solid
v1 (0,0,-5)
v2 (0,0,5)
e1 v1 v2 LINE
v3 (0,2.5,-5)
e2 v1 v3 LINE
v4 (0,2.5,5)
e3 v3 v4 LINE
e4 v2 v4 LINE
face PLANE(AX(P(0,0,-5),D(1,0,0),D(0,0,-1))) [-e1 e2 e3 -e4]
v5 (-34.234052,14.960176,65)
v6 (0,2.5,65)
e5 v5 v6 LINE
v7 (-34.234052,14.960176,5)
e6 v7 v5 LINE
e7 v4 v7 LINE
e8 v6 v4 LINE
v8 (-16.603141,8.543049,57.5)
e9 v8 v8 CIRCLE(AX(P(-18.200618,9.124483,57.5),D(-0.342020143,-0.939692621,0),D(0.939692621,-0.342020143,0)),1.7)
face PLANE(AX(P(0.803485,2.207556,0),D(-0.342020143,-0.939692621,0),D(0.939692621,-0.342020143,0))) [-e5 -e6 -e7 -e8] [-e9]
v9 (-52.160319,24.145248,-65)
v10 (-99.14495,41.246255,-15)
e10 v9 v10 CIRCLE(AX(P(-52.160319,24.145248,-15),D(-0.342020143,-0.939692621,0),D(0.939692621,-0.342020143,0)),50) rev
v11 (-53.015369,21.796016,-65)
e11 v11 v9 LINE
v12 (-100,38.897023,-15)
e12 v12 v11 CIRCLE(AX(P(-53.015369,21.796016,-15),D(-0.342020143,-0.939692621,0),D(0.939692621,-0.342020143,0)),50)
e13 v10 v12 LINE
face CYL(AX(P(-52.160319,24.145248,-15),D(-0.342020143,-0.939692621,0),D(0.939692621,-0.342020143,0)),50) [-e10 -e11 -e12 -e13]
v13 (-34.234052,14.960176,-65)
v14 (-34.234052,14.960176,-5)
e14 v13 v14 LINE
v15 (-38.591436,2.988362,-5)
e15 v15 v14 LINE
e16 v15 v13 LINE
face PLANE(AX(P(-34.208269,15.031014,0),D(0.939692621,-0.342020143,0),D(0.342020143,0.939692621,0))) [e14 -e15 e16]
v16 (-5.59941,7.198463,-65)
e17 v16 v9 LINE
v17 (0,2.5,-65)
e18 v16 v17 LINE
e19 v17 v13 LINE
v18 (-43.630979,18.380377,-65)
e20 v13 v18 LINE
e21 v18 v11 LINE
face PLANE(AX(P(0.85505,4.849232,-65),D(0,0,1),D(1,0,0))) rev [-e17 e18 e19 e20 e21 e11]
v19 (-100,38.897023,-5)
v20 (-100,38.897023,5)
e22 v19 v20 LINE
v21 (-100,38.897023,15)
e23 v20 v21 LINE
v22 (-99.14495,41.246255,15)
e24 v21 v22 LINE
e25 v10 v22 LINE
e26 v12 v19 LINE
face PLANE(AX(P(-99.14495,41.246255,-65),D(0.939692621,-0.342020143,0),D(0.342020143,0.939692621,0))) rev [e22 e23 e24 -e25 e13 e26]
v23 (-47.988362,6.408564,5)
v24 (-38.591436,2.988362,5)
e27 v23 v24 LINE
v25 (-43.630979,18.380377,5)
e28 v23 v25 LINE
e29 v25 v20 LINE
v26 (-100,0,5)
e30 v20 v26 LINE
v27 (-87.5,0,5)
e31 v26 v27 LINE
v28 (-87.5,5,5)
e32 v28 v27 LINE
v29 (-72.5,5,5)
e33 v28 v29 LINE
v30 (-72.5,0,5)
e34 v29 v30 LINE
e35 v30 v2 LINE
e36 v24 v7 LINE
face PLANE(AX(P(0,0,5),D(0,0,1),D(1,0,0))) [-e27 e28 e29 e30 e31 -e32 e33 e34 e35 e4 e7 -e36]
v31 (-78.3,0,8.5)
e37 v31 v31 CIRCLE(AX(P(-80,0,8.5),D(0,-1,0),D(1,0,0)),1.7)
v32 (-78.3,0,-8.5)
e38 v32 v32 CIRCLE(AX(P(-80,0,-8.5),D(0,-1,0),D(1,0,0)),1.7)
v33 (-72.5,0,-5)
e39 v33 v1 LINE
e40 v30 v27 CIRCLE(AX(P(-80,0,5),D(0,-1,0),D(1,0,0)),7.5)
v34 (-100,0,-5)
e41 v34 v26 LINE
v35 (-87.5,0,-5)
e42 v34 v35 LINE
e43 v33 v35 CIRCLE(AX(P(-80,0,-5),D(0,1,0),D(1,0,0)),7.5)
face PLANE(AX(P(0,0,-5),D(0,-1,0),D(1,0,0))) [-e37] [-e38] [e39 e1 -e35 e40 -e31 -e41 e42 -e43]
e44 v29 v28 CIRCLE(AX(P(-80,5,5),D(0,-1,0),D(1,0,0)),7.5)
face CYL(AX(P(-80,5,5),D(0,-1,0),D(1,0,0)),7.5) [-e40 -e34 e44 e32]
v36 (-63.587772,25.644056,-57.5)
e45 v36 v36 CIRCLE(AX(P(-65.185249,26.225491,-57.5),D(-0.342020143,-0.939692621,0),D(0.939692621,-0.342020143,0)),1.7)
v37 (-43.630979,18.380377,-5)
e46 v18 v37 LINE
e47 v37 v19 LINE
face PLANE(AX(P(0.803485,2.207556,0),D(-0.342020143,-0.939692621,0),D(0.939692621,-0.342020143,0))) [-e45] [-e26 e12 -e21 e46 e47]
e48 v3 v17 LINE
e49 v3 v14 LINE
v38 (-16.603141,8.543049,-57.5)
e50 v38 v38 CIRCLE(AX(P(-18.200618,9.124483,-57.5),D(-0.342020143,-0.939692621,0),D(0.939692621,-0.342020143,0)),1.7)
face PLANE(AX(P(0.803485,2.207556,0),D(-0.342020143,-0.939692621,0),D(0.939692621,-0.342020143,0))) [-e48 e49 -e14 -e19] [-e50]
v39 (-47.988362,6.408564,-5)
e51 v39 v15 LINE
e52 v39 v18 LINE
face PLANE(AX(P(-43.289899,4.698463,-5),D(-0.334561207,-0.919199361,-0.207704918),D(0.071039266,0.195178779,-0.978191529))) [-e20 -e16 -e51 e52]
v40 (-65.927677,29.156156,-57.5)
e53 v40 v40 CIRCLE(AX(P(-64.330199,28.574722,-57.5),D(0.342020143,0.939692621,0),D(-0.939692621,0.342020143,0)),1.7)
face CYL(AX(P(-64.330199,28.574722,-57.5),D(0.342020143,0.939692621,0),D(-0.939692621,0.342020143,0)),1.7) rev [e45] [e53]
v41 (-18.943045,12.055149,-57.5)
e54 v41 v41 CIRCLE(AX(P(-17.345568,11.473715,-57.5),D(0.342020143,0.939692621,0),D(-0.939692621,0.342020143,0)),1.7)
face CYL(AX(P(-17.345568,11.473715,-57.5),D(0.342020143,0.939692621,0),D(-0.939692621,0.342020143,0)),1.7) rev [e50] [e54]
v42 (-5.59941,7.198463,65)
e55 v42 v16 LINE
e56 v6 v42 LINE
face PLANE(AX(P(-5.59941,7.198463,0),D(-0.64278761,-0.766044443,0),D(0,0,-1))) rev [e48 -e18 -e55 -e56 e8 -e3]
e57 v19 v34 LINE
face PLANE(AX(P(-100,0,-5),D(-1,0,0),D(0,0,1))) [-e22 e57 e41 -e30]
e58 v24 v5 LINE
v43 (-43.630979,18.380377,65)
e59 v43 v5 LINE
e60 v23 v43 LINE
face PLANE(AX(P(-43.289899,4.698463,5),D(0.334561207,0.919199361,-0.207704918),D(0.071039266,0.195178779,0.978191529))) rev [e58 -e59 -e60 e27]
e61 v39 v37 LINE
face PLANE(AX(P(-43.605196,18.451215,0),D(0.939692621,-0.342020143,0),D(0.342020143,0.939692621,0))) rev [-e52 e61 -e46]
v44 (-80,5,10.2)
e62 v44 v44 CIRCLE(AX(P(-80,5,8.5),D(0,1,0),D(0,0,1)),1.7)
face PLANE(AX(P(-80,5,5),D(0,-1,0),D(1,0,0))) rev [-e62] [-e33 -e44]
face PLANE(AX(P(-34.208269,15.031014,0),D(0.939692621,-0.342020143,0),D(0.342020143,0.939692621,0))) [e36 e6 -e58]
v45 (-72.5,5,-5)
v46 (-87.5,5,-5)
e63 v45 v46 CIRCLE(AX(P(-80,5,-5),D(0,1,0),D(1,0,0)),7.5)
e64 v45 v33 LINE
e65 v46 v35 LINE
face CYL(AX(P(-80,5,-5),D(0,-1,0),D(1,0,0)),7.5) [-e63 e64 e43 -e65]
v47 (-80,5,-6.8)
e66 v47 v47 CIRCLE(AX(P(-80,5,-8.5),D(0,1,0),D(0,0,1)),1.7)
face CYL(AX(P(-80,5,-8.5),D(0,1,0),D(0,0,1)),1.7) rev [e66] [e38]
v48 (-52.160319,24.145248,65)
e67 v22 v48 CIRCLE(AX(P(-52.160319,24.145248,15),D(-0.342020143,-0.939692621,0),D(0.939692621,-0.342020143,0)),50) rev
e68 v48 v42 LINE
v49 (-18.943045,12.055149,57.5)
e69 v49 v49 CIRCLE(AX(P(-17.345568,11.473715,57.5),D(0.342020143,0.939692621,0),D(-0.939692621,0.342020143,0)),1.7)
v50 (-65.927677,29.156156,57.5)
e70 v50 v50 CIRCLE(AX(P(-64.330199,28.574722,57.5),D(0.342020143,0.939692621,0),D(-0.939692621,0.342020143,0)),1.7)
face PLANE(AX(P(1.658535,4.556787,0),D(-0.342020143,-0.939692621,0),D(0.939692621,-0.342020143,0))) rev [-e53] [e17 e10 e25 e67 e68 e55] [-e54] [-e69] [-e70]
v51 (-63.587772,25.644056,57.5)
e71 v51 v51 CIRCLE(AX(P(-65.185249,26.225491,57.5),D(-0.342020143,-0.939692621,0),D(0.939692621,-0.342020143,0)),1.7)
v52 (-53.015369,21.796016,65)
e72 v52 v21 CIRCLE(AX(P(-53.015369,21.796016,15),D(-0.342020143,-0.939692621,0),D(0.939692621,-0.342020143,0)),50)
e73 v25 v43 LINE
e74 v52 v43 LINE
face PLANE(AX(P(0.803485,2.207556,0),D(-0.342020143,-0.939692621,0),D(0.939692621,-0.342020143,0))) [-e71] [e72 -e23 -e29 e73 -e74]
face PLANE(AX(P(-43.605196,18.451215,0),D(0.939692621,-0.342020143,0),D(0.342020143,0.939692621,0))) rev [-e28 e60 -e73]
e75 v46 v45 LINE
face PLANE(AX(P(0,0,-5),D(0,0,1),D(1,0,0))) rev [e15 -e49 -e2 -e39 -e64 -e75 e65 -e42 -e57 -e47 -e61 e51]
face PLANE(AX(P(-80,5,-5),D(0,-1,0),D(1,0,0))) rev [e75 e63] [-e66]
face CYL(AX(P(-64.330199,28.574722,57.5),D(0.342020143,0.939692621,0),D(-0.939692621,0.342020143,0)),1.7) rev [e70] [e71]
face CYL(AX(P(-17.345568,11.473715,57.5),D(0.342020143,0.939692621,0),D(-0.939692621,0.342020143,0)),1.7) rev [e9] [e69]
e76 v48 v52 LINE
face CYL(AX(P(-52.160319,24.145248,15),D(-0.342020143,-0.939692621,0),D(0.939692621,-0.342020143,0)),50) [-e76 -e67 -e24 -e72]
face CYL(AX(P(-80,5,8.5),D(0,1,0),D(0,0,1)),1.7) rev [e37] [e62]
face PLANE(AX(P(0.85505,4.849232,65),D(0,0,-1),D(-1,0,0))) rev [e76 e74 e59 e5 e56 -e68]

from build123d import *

# Parameters (mm, degrees)
ESTRUSIONE_ESTRUSIONE1_DEPTH      = 5
ESTRUSIONE_ESTRUSIONE1_DEPTH_BACK = 5
ESTRUSIONE_ESTRUSIONE3_DEPTH      = 5
FORO_PER_VITE_M3_1_D              = 3.4
SCHIZZO26_W                       = 106.417777248
SCHIZZO26_H                       = 130
ESTRUSIONE_ESTRUSIONE5_DEPTH      = 2.5
NERVATURA2_REACH                  = 94.596
SCHIZZO29_WALL_W                  = 248.530633184
SCHIZZO29_WALL_H                  = 10
SMUSSO1_SIZE2                     = 6.868693549
SMUSSO1_SIZE                      = 2.5
RACCORDO1_R                       = 50
FORO_PER_VITE_M3_2_D              = 3.4


with BuildPart() as part:
    # Schizzo1 → Estrusione-Estrusione1 (new, two sides: drawn at the far end of the back side and taken through both)
    with BuildSketch(Plane.XY.offset(-ESTRUSIONE_ESTRUSIONE1_DEPTH_BACK)):
        Polygon((0, 0), (-100, 0), (-100, 38.897023427), (0, 2.5), align=None)
    extrude(amount=ESTRUSIONE_ESTRUSIONE1_DEPTH + ESTRUSIONE_ESTRUSIONE1_DEPTH_BACK)

    # Schizzo18 → Estrusione-Estrusione3 (add)
    with BuildSketch(Plane.XZ):
        with BuildLine():
            Line((-87.5, 5), (-72.5, 5))
            ThreePointArc((-72.5, 5), (-80, 12.5), (-87.5, 5))
        make_face()
    estrusione_estrusione3 = extrude(amount=-ESTRUSIONE_ESTRUSIONE3_DEPTH)

    # Foro per Vite M3-1 (through all)
    with Locations(Plane(origin=(-80, 5, 8.5), x_dir=(1, 0, 0), z_dir=(0, 1, 0))):
        with Locations((0, 0)):
            foro_per_vite_m3_1 = Hole(FORO_PER_VITE_M3_1_D / 2)

    # Specchia2: Estrusione-Estrusione3, Foro per Vite M3-1 across plane
    add(estrusione_estrusione3.mirror(Plane.XY))
    add(foro_per_vite_m3_1.mirror(Plane.XY), mode=Mode.SUBTRACT)

    # Schizzo26 → Estrusione-Estrusione5 (add)
    with BuildSketch(Plane(origin=(0.803484512, 2.207555554, 0), x_dir=(0.9396926207859082, -0.3420201433256694, 0), z_dir=(0.3420201433256694, 0.9396926207859083, 0))):
        with Locations((-54.063938982, 0)):
            Rectangle(SCHIZZO26_W, SCHIZZO26_H)
    extrude(amount=ESTRUSIONE_ESTRUSIONE5_DEPTH)

    # Schizzo29 wall → Nervatura2 (add, up to next)
    with BuildSketch(Plane(origin=(-41.11120737, 10.684369938, 35), x_dir=(0.071039265759, 0.195178778583, 0.978191528849), z_dir=(-0.334561206897, -0.919199361374, 0.207704917825)), mode=Mode.PRIVATE) as nervatura2_sk1:
        Rectangle(SCHIZZO29_WALL_W, SCHIZZO29_WALL_H)
    nervatura2_tool1 = extrude(nervatura2_sk1.sketch, amount=-NERVATURA2_REACH, mode=Mode.PRIVATE) - part.part
    nervatura2 = nervatura2_tool1.solids().sort_by_distance((-41.11120737, 10.684369938, 35))[0]
    add(nervatura2)

    # Specchia3: Nervatura2 across plane
    add(nervatura2.mirror(Plane.XY))

    # Smusso1
    smusso1_edges = [part.edges().sort_by_distance(p)[0] for p in [
        (0.855050358, 4.849231552, 0),
    ]]
    smusso1_side = [part.faces().sort_by_distance(p)[0] for p in [
        (0.837949351, 4.802246921, 0),
    ]]
    chamfer(smusso1_edges, length=SMUSSO1_SIZE - 0.0001, length2=SMUSSO1_SIZE2 - 0.0001, reference=smusso1_side[0])  # a hair under: the kernel refuses the full size

    # Raccordo1
    raccordo1_edges = [part.edges().sort_by_distance(p)[0] for p in [
        (-99.572474821, 40.071639203, -65),
        (-99.572474821, 40.071639203, 65),
    ]]
    fillet(raccordo1_edges, radius=RACCORDO1_R)

    # Foro per Vite M3-2 (through all)
    with Locations(Plane(origin=(1.65853487, 4.556787106, 0), x_dir=(0.9396926207859082, -0.3420201433256695, 0), z_dir=(0.3420201433256695, 0.9396926207859082, 0))):
        with Locations((-70.223743907, 57.5), (-70.223743907, -57.5), (-20.223743907, -57.5), (-20.223743907, 57.5)):
            Hole(FORO_PER_VITE_M3_2_D / 2)


solid = part.part
